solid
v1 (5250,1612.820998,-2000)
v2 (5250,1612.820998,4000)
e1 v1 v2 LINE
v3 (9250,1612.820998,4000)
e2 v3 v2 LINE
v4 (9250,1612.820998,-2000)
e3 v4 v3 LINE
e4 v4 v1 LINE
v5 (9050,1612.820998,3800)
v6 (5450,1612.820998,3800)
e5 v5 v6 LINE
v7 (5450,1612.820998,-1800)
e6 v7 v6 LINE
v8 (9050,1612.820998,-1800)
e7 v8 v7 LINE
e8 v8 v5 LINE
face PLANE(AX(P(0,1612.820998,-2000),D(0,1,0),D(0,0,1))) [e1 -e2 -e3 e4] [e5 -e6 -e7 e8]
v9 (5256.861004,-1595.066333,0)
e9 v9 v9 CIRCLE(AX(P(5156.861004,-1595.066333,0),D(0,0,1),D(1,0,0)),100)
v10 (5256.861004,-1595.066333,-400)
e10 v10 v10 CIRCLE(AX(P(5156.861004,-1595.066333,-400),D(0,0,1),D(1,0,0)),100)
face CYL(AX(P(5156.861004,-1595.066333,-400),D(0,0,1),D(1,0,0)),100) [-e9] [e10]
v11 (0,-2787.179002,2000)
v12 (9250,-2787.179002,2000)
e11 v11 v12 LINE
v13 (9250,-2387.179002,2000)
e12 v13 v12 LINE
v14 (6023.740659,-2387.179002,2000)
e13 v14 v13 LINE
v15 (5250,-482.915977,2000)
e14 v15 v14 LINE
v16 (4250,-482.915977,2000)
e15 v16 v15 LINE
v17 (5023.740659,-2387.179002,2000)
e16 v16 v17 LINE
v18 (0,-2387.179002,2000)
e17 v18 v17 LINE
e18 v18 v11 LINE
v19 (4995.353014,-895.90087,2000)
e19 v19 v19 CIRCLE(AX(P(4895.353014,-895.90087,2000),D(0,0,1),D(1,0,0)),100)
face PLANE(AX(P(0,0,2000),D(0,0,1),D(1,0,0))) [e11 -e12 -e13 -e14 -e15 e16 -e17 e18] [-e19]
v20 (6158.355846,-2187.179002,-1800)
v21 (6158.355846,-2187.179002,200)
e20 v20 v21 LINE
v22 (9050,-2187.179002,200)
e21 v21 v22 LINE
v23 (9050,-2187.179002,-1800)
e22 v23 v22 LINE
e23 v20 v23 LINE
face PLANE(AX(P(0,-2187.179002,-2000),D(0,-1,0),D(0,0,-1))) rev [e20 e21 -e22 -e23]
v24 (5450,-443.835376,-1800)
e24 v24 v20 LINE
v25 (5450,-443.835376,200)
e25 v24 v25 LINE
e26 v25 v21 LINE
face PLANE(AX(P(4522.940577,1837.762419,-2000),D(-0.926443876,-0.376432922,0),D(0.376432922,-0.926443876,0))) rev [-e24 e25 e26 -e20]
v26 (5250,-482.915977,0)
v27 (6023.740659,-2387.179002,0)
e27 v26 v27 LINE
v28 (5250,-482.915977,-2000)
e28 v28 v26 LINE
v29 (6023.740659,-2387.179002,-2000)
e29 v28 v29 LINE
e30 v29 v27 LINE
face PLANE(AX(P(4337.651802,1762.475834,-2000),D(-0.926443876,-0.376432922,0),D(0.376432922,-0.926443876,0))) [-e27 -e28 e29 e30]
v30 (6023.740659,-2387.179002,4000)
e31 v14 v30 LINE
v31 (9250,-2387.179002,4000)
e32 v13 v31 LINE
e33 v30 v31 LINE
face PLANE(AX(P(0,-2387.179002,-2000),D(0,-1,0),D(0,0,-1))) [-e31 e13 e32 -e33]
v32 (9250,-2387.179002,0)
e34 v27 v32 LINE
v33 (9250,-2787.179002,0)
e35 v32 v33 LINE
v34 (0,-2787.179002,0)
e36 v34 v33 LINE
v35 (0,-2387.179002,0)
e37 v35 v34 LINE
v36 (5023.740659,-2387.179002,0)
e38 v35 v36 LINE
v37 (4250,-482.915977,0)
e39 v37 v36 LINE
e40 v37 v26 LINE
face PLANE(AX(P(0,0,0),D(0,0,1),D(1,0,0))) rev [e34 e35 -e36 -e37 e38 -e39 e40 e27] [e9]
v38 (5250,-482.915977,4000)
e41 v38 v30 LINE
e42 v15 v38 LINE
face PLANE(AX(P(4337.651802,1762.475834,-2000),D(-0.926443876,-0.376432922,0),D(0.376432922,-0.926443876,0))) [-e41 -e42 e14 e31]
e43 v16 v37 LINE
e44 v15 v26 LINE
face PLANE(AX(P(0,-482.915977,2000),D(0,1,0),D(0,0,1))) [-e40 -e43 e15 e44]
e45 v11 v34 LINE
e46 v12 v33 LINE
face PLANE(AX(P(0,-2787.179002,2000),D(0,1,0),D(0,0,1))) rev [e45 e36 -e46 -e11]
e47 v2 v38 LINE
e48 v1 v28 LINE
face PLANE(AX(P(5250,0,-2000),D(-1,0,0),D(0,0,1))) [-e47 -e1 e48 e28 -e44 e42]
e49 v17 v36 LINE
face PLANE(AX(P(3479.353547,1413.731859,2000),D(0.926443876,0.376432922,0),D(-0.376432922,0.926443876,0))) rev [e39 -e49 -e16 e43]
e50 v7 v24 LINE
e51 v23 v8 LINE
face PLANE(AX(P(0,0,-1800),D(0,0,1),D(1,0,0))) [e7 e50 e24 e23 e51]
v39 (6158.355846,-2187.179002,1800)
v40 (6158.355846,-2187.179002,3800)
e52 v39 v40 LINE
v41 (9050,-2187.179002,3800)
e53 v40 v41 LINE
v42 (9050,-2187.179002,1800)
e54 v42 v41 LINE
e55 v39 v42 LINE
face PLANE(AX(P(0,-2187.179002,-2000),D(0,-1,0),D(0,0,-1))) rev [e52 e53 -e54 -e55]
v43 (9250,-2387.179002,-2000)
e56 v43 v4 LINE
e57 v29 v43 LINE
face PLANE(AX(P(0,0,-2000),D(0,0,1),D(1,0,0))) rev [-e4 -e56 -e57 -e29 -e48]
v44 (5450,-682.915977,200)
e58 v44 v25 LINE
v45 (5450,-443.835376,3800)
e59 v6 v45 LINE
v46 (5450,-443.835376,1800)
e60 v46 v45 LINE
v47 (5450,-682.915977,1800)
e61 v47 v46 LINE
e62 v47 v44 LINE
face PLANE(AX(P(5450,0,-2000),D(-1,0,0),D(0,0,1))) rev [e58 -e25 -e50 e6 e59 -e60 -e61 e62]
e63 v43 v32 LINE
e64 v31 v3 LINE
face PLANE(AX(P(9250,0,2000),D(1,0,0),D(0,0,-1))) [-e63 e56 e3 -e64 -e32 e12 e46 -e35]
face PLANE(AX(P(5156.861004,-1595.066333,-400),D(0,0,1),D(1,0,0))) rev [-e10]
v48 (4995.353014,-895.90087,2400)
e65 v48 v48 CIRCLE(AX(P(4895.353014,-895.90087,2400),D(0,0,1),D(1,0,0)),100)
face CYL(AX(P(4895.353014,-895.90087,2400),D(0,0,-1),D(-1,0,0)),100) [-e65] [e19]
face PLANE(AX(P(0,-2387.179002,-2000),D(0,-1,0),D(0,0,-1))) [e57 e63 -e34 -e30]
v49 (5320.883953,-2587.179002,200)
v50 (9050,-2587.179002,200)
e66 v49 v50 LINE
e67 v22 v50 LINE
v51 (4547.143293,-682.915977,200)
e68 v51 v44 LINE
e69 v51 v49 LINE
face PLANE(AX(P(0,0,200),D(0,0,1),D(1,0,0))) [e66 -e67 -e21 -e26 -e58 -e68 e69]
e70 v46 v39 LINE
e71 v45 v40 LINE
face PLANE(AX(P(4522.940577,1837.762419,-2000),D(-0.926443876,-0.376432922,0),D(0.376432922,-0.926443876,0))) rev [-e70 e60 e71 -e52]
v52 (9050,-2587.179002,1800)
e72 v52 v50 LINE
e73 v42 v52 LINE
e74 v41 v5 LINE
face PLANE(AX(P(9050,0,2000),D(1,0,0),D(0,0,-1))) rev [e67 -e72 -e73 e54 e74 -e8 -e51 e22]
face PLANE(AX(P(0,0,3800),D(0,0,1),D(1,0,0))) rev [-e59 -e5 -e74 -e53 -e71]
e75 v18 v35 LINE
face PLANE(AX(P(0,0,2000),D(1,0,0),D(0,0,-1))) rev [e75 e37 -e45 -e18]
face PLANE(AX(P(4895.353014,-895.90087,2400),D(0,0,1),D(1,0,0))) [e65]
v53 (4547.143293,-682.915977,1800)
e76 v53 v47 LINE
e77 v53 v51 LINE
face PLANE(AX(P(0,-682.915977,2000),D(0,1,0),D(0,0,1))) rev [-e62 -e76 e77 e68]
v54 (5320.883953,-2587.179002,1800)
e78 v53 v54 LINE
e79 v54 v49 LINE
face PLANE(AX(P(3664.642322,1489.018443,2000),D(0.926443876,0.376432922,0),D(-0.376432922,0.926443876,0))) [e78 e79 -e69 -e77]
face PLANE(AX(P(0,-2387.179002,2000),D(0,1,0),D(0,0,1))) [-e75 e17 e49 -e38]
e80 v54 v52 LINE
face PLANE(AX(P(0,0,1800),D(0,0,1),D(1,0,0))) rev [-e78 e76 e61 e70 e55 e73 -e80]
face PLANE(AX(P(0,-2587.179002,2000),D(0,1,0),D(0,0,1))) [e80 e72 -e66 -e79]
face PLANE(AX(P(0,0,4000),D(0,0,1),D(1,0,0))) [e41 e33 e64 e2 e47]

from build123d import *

# Parameters (mm, degrees)
SKETCH14_R               = 100
SKETCH14_W               = 9250
SKETCH14_H               = 400
BOSS_EXTRUDE1_DEPTH      = 2000
BOSS_EXTRUDE2_DEPTH      = 4000
BOSS_EXTRUDE2_DEPTH_BACK = 2000
SHELL2_START             = -1800
SHELL2_DEPTH             = 5600
SHELL2_START_2           = 200
SHELL2_2_DEPTH           = 1600
SKETCH16_R               = 100
BOSS_EXTRUDE3_DEPTH      = 400
SKETCH14_4_R             = 100
BOSS_EXTRUDE4_DEPTH      = 400


# Read off the part's stored shape, not the designer's step: Shell2
with BuildPart() as part:
    # Sketch14 → Boss-Extrude1 (new body)
    # profile 1 of 4: a face of its own
    with BuildSketch(Plane.XY):
        Polygon((4250, -482.915977061), (5023.740659122, -2387.179002407), (6023.740659122, -2387.179002407), (5250, -482.915977061), align=None)
        with Locations((5156.86100387, -1595.066332677)):
            Circle(SKETCH14_R, mode=Mode.SUBTRACT)
        with Locations((4895.353014227, -895.900869711)):
            Circle(SKETCH14_R, mode=Mode.SUBTRACT)
    # profile 2 of 4: a face of its own
    with BuildSketch(Plane.XY):
        with Locations((4625, -2587.179002407)):
            Rectangle(SKETCH14_W, SKETCH14_H)
    # profile 3 of 4: a face of its own
    with BuildSketch(Plane.XY):
        with Locations((4895.353014227, -895.900869711)):
            Circle(SKETCH14_R)
    # profile 4 of 4: a face of its own
    with BuildSketch(Plane.XY):
        with Locations((5156.86100387, -1595.066332677)):
            Circle(SKETCH14_R)
    extrude(amount=BOSS_EXTRUDE1_DEPTH)

    # Sketch14<3> → Boss-Extrude2 (add, two sides: drawn at the far end of the back side and taken through both)
    with BuildSketch(Plane.XY.offset(-BOSS_EXTRUDE2_DEPTH_BACK)):
        Polygon((5250, -482.915977061), (6023.740659122, -2387.179002407), (9250, -2387.179002407), (9250, 1612.820997593), (5250, 1612.820997593), align=None)
    extrude(amount=BOSS_EXTRUDE2_DEPTH + BOSS_EXTRUDE2_DEPTH_BACK)

    # Shell2 outline → Shell2 (cut)
    with BuildSketch(Plane.XY.offset(SHELL2_START)):
        Polygon((5450, 1612.820997593), (5450, -443.835376078), (6158.355846098, -2187.179002407), (9050, -2187.179002407), (9050, 1612.820997593), align=None)
    extrude(amount=SHELL2_DEPTH, mode=Mode.SUBTRACT)

    # Shell2 2 outline → Shell2 2 (cut)
    with BuildSketch(Plane.XY.offset(SHELL2_START_2)):
        Polygon((5450, -443.835376078), (5450, -682.915977061), (4547.143293403, -682.915977061), (5320.883952525, -2587.179002407), (9050, -2587.179002407), (9050, -2187.179002407), (6158.355846098, -2187.179002407), align=None)
    extrude(amount=SHELL2_2_DEPTH, mode=Mode.SUBTRACT)

    # Sketch16 → Boss-Extrude3 (add)
    with BuildSketch(Plane.XY.offset(2000)):
        with Locations((4895.353014227, -895.900869711)):
            Circle(SKETCH16_R)
    extrude(amount=BOSS_EXTRUDE3_DEPTH)

    # Sketch14<4> → Boss-Extrude4 (add)
    with BuildSketch(Plane.XY):
        with Locations((5156.86100387, -1595.066332677)):
            Circle(SKETCH14_4_R)
    extrude(amount=-BOSS_EXTRUDE4_DEPTH)


solid = part.part
